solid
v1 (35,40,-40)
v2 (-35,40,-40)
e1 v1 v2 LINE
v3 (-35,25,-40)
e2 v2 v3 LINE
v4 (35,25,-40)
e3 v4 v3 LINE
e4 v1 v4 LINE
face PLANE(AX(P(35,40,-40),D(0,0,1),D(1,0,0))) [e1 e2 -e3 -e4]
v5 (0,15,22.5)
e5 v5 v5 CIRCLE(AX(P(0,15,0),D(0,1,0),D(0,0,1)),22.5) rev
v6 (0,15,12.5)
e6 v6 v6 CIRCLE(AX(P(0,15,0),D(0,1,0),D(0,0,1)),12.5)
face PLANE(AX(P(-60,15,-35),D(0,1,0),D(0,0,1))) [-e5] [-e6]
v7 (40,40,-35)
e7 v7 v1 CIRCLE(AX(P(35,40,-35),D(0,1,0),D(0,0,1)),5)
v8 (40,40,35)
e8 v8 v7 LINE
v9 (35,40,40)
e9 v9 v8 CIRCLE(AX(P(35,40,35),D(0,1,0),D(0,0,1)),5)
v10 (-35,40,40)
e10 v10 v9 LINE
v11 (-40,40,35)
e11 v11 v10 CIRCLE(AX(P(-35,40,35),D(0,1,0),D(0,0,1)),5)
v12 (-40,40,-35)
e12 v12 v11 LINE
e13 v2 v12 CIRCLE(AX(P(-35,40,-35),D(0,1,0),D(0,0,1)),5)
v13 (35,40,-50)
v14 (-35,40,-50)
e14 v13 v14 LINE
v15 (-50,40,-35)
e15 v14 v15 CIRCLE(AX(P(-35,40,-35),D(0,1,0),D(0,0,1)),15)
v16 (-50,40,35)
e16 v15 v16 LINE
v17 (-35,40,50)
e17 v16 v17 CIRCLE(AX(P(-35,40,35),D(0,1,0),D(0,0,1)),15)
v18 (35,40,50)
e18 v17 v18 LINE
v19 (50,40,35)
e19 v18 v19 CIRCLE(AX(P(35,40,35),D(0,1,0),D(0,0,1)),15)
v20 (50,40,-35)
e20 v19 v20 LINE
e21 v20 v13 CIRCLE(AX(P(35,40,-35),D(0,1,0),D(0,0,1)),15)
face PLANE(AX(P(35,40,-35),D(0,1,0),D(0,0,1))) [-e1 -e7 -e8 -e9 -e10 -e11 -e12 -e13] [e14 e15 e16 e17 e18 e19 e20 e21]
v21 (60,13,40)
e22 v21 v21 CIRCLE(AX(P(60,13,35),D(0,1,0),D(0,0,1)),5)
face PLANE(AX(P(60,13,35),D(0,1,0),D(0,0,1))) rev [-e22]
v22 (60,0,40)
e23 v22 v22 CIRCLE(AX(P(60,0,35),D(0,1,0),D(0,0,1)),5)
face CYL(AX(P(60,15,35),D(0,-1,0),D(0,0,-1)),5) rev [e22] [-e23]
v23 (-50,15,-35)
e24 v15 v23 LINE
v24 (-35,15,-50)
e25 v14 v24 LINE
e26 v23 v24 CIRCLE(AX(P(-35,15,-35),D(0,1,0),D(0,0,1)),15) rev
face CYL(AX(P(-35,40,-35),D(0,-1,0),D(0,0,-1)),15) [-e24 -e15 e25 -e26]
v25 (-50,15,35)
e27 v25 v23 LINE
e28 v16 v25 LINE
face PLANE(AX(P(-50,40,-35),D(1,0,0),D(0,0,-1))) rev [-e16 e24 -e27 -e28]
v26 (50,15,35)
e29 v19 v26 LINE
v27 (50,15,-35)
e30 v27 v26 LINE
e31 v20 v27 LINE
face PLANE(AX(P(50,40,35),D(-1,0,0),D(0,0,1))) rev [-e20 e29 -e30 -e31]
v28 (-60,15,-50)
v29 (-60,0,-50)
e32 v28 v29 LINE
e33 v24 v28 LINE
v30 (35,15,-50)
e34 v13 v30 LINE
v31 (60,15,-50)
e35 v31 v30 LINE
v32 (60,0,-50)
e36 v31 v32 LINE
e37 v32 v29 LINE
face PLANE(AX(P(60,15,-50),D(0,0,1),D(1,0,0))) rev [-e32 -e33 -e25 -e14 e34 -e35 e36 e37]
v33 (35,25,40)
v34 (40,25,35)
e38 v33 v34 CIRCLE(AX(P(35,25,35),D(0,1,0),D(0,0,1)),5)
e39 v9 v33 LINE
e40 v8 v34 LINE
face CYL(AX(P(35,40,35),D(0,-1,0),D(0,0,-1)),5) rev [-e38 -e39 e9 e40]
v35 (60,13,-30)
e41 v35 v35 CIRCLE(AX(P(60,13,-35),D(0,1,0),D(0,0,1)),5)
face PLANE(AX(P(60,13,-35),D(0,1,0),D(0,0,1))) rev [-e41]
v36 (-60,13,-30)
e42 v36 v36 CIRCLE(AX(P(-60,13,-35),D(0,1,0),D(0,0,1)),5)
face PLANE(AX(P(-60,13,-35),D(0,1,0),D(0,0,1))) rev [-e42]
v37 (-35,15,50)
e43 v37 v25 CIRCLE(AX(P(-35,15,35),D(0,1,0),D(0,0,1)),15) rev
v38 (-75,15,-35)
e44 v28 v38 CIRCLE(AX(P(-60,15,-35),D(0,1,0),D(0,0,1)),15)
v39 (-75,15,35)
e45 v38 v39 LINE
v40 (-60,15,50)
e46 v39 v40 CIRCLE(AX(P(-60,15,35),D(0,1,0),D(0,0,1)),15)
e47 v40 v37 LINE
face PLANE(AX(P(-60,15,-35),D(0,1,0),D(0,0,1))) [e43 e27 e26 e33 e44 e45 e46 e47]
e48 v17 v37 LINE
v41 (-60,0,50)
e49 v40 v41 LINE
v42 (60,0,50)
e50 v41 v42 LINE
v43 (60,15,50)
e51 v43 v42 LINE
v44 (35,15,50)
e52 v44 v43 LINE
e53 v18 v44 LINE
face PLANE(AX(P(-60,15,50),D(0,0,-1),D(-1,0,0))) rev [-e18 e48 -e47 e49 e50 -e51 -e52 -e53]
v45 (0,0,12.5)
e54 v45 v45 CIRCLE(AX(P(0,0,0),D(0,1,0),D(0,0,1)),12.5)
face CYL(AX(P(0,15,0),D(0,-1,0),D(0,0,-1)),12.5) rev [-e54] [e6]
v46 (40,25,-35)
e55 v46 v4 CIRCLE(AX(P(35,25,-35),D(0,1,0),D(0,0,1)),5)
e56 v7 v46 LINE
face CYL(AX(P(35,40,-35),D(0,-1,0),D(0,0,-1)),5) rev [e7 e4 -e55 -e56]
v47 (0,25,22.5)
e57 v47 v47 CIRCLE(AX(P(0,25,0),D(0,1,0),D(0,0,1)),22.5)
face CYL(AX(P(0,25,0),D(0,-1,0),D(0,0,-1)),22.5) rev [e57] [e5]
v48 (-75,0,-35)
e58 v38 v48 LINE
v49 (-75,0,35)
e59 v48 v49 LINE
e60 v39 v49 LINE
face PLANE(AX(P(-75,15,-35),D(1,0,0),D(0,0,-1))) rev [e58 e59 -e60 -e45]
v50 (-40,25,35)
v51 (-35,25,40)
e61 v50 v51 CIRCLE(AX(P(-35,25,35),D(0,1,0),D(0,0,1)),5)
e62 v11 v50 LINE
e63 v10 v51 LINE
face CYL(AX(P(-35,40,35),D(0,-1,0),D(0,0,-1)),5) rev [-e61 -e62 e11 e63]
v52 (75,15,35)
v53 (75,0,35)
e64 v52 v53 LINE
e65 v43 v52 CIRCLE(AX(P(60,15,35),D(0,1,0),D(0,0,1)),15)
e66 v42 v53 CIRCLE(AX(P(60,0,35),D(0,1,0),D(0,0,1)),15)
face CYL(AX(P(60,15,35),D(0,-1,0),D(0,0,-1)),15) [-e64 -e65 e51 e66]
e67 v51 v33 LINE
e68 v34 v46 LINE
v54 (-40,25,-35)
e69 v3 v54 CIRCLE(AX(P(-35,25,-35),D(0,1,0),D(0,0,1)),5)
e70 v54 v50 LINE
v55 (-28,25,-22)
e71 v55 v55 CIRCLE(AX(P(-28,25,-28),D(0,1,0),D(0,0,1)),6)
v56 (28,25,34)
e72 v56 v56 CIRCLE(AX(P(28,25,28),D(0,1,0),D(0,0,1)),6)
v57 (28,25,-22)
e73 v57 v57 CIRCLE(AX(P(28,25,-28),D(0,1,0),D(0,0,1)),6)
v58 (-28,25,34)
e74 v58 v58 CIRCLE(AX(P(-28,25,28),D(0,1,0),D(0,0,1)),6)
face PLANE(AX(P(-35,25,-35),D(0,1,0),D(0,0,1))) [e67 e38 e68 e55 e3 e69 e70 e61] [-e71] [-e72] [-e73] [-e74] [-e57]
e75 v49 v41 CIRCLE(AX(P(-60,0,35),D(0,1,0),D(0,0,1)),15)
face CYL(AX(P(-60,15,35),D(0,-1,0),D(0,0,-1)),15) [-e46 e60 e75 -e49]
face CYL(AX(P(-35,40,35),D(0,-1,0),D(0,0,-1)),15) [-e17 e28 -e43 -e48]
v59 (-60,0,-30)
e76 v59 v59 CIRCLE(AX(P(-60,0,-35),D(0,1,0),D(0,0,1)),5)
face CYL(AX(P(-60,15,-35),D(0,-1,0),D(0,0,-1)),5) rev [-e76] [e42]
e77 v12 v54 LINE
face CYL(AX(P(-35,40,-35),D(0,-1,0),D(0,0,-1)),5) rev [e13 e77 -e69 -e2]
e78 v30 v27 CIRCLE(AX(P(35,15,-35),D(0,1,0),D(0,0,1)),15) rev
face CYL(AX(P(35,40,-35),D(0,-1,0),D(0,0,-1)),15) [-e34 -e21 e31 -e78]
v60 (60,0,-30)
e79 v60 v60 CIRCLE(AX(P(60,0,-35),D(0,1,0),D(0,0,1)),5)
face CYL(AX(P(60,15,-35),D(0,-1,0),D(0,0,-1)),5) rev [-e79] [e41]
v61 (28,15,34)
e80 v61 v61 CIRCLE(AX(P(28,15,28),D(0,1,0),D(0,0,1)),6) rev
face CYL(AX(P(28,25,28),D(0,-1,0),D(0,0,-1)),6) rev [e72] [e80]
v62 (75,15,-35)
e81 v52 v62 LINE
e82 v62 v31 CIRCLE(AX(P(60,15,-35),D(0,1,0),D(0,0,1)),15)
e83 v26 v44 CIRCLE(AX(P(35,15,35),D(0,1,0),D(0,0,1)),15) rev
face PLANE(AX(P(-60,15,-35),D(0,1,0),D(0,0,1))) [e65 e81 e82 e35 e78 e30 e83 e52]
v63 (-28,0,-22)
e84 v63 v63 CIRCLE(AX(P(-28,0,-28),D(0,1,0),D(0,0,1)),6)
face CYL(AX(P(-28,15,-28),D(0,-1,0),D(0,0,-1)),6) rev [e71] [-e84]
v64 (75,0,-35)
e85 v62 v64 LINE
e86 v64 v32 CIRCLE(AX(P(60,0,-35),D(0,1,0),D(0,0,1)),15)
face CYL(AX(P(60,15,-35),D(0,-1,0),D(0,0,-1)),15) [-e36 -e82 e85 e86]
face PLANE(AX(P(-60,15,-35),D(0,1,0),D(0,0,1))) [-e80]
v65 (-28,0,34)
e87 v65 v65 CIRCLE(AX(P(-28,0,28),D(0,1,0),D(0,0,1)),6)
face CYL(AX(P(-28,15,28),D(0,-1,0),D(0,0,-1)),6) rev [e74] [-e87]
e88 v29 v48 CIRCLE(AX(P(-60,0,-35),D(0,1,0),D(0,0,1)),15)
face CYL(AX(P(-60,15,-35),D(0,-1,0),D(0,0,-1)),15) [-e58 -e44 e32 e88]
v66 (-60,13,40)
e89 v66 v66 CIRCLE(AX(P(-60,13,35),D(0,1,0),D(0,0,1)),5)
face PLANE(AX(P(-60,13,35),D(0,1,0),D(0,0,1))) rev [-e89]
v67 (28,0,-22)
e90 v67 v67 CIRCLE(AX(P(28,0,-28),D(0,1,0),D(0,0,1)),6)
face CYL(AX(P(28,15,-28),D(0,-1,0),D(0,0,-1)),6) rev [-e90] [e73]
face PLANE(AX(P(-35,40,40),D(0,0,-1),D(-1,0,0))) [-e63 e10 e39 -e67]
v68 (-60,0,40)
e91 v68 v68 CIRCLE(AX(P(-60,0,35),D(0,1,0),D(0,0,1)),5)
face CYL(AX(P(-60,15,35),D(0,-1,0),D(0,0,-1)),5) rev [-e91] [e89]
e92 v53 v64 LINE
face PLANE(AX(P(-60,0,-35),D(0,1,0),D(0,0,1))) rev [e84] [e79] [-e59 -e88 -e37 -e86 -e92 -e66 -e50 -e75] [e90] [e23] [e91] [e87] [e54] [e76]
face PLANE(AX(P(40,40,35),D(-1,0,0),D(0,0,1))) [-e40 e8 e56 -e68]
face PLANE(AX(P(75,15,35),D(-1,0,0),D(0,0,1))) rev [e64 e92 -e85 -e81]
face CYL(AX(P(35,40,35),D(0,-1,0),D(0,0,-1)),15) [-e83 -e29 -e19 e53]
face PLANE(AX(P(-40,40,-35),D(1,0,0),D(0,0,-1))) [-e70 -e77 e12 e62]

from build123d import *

# Parameters (mm, degrees)
CROQUIS3_R              = 12.5
CROQUIS3_R_2            = 6
CROQUIS3_R_3            = 5
SALIENTE_EXTRUIR1_DEPTH = 15
SALIENTE_EXTRUIR2_START = 15
CROQUIS4_R              = 7.5
SALIENTE_EXTRUIR2_DEPTH = 2
SALIENTE_EXTRUIR3_DEPTH = 40
CROQUIS6_R              = 22.5
CROQUIS6_R_2            = 6
SALIENTE_EXTRUIR4_DEPTH = 25


with BuildPart() as part:
    # Croquis3 → Saliente-Extruir1 (new body)
    with BuildSketch(Plane(origin=(0, 0, 0), x_dir=(1, 0, 0), z_dir=(0, 1, 0))):
        with BuildLine():
            Line((60, 50), (-60, 50))
            ThreePointArc((-60, 50), (-70.606601718, 45.606601718), (-75, 35))
            Line((-75, 35), (-75, -35))
            ThreePointArc((-75, -35), (-70.606601718, -45.606601718), (-60, -50))
            Line((-60, -50), (60, -50))
            ThreePointArc((60, -50), (70.606601718, -45.606601718), (75, -35))
            Line((75, -35), (75, 35))
            ThreePointArc((75, 35), (70.606601718, 45.606601718), (60, 50))
        make_face()
        with Locations(Location((0, 0, 0), (0, 0, 270))):
            Circle(CROQUIS3_R, mode=Mode.SUBTRACT)
        with Locations(Location((-28, -28, 0), (0, 0, 270))):
            Circle(CROQUIS3_R_2, mode=Mode.SUBTRACT)
        with Locations(Location((-28, 28, 0), (0, 0, 270))):
            Circle(CROQUIS3_R_2, mode=Mode.SUBTRACT)
        with Locations(Location((28, 28, 0), (0, 0, 270))):
            Circle(CROQUIS3_R_2, mode=Mode.SUBTRACT)
        with Locations(Location((60, 35, 0), (0, 0, 270))):
            Circle(CROQUIS3_R_3, mode=Mode.SUBTRACT)
        with Locations(Location((60, -35, 0), (0, 0, 270))):
            Circle(CROQUIS3_R_3, mode=Mode.SUBTRACT)
        with Locations(Location((-60, -35, 0), (0, 0, 270))):
            Circle(CROQUIS3_R_3, mode=Mode.SUBTRACT)
        with Locations(Location((-60, 35, 0), (0, 0, 270))):
            Circle(CROQUIS3_R_3, mode=Mode.SUBTRACT)
    extrude(amount=SALIENTE_EXTRUIR1_DEPTH)

    # Croquis4 → Saliente-Extruir2 (add)
    with BuildSketch(Plane(origin=(0, 0, 0), x_dir=(1, 0, 0), z_dir=(0, 1, 0)).offset(SALIENTE_EXTRUIR2_START)):
        with Locations((60, -35)):
            Circle(CROQUIS4_R)
        with Locations((60, 35)):
            Circle(CROQUIS4_R)
        with Locations((-60, 35)):
            Circle(CROQUIS4_R)
        with Locations((-60, -35)):
            Circle(CROQUIS4_R)
    extrude(amount=-SALIENTE_EXTRUIR2_DEPTH)

    # Croquis5 → Saliente-Extruir3 (add)
    with BuildSketch(Plane(origin=(0, 0, 0), x_dir=(1, 0, 0), z_dir=(0, 1, 0))):
        with BuildLine():
            Line((50, -35), (50, 35))
            ThreePointArc((50, 35), (45.606601718, 45.606601718), (35, 50))
            Line((35, 50), (-35, 50))
            ThreePointArc((-35, 50), (-45.606601718, 45.606601718), (-50, 35))
            Line((-50, 35), (-50, -35))
            ThreePointArc((-50, -35), (-45.606601718, -45.606601718), (-35, -50))
            Line((-35, -50), (35, -50))
            ThreePointArc((35, -50), (45.606601718, -45.606601718), (50, -35))
        make_face()
        with BuildLine():
            Line((35, 40), (-35, 40))
            ThreePointArc((-35, 40), (-38.535533906, 38.535533906), (-40, 35))
            Line((-40, 35), (-40, -35))
            ThreePointArc((-40, -35), (-38.535533906, -38.535533906), (-35, -40))
            Line((-35, -40), (35, -40))
            ThreePointArc((35, -40), (38.535533906, -38.535533906), (40, -35))
            Line((40, -35), (40, 35))
            ThreePointArc((40, 35), (38.535533906, 38.535533906), (35, 40))
        make_face(mode=Mode.SUBTRACT)
    extrude(amount=SALIENTE_EXTRUIR3_DEPTH)

    # Croquis6 → Saliente-Extruir4 (add)
    with BuildSketch(Plane(origin=(0, 0, 0), x_dir=(1, 0, 0), z_dir=(0, 1, 0))):
        with BuildLine():
            Line((-35, -40), (35, -40))
            ThreePointArc((35, -40), (38.535533906, -38.535533906), (40, -35))
            Line((40, -35), (40, 35))
            ThreePointArc((40, 35), (38.535533906, 38.535533906), (35, 40))
            Line((35, 40), (-35, 40))
            ThreePointArc((-35, 40), (-38.535533906, 38.535533906), (-40, 35))
            Line((-40, 35), (-40, -35))
            ThreePointArc((-40, -35), (-38.535533906, -38.535533906), (-35, -40))
        make_face()
        with Locations(Location((0, 0, 0), (0, 0, 270))):
            Circle(CROQUIS6_R, mode=Mode.SUBTRACT)
        with Locations(Location((28, 28, 0), (0, 0, 270))):
            Circle(CROQUIS6_R_2, mode=Mode.SUBTRACT)
        with Locations(Location((28, -28, 0), (0, 0, 270))):
            Circle(CROQUIS6_R_2, mode=Mode.SUBTRACT)
        with Locations(Location((-28, -28, 0), (0, 0, 270))):
            Circle(CROQUIS6_R_2, mode=Mode.SUBTRACT)
        with Locations(Location((-28, 28, 0), (0, 0, 270))):
            Circle(CROQUIS6_R_2, mode=Mode.SUBTRACT)
    extrude(amount=SALIENTE_EXTRUIR4_DEPTH)


solid = part.part
